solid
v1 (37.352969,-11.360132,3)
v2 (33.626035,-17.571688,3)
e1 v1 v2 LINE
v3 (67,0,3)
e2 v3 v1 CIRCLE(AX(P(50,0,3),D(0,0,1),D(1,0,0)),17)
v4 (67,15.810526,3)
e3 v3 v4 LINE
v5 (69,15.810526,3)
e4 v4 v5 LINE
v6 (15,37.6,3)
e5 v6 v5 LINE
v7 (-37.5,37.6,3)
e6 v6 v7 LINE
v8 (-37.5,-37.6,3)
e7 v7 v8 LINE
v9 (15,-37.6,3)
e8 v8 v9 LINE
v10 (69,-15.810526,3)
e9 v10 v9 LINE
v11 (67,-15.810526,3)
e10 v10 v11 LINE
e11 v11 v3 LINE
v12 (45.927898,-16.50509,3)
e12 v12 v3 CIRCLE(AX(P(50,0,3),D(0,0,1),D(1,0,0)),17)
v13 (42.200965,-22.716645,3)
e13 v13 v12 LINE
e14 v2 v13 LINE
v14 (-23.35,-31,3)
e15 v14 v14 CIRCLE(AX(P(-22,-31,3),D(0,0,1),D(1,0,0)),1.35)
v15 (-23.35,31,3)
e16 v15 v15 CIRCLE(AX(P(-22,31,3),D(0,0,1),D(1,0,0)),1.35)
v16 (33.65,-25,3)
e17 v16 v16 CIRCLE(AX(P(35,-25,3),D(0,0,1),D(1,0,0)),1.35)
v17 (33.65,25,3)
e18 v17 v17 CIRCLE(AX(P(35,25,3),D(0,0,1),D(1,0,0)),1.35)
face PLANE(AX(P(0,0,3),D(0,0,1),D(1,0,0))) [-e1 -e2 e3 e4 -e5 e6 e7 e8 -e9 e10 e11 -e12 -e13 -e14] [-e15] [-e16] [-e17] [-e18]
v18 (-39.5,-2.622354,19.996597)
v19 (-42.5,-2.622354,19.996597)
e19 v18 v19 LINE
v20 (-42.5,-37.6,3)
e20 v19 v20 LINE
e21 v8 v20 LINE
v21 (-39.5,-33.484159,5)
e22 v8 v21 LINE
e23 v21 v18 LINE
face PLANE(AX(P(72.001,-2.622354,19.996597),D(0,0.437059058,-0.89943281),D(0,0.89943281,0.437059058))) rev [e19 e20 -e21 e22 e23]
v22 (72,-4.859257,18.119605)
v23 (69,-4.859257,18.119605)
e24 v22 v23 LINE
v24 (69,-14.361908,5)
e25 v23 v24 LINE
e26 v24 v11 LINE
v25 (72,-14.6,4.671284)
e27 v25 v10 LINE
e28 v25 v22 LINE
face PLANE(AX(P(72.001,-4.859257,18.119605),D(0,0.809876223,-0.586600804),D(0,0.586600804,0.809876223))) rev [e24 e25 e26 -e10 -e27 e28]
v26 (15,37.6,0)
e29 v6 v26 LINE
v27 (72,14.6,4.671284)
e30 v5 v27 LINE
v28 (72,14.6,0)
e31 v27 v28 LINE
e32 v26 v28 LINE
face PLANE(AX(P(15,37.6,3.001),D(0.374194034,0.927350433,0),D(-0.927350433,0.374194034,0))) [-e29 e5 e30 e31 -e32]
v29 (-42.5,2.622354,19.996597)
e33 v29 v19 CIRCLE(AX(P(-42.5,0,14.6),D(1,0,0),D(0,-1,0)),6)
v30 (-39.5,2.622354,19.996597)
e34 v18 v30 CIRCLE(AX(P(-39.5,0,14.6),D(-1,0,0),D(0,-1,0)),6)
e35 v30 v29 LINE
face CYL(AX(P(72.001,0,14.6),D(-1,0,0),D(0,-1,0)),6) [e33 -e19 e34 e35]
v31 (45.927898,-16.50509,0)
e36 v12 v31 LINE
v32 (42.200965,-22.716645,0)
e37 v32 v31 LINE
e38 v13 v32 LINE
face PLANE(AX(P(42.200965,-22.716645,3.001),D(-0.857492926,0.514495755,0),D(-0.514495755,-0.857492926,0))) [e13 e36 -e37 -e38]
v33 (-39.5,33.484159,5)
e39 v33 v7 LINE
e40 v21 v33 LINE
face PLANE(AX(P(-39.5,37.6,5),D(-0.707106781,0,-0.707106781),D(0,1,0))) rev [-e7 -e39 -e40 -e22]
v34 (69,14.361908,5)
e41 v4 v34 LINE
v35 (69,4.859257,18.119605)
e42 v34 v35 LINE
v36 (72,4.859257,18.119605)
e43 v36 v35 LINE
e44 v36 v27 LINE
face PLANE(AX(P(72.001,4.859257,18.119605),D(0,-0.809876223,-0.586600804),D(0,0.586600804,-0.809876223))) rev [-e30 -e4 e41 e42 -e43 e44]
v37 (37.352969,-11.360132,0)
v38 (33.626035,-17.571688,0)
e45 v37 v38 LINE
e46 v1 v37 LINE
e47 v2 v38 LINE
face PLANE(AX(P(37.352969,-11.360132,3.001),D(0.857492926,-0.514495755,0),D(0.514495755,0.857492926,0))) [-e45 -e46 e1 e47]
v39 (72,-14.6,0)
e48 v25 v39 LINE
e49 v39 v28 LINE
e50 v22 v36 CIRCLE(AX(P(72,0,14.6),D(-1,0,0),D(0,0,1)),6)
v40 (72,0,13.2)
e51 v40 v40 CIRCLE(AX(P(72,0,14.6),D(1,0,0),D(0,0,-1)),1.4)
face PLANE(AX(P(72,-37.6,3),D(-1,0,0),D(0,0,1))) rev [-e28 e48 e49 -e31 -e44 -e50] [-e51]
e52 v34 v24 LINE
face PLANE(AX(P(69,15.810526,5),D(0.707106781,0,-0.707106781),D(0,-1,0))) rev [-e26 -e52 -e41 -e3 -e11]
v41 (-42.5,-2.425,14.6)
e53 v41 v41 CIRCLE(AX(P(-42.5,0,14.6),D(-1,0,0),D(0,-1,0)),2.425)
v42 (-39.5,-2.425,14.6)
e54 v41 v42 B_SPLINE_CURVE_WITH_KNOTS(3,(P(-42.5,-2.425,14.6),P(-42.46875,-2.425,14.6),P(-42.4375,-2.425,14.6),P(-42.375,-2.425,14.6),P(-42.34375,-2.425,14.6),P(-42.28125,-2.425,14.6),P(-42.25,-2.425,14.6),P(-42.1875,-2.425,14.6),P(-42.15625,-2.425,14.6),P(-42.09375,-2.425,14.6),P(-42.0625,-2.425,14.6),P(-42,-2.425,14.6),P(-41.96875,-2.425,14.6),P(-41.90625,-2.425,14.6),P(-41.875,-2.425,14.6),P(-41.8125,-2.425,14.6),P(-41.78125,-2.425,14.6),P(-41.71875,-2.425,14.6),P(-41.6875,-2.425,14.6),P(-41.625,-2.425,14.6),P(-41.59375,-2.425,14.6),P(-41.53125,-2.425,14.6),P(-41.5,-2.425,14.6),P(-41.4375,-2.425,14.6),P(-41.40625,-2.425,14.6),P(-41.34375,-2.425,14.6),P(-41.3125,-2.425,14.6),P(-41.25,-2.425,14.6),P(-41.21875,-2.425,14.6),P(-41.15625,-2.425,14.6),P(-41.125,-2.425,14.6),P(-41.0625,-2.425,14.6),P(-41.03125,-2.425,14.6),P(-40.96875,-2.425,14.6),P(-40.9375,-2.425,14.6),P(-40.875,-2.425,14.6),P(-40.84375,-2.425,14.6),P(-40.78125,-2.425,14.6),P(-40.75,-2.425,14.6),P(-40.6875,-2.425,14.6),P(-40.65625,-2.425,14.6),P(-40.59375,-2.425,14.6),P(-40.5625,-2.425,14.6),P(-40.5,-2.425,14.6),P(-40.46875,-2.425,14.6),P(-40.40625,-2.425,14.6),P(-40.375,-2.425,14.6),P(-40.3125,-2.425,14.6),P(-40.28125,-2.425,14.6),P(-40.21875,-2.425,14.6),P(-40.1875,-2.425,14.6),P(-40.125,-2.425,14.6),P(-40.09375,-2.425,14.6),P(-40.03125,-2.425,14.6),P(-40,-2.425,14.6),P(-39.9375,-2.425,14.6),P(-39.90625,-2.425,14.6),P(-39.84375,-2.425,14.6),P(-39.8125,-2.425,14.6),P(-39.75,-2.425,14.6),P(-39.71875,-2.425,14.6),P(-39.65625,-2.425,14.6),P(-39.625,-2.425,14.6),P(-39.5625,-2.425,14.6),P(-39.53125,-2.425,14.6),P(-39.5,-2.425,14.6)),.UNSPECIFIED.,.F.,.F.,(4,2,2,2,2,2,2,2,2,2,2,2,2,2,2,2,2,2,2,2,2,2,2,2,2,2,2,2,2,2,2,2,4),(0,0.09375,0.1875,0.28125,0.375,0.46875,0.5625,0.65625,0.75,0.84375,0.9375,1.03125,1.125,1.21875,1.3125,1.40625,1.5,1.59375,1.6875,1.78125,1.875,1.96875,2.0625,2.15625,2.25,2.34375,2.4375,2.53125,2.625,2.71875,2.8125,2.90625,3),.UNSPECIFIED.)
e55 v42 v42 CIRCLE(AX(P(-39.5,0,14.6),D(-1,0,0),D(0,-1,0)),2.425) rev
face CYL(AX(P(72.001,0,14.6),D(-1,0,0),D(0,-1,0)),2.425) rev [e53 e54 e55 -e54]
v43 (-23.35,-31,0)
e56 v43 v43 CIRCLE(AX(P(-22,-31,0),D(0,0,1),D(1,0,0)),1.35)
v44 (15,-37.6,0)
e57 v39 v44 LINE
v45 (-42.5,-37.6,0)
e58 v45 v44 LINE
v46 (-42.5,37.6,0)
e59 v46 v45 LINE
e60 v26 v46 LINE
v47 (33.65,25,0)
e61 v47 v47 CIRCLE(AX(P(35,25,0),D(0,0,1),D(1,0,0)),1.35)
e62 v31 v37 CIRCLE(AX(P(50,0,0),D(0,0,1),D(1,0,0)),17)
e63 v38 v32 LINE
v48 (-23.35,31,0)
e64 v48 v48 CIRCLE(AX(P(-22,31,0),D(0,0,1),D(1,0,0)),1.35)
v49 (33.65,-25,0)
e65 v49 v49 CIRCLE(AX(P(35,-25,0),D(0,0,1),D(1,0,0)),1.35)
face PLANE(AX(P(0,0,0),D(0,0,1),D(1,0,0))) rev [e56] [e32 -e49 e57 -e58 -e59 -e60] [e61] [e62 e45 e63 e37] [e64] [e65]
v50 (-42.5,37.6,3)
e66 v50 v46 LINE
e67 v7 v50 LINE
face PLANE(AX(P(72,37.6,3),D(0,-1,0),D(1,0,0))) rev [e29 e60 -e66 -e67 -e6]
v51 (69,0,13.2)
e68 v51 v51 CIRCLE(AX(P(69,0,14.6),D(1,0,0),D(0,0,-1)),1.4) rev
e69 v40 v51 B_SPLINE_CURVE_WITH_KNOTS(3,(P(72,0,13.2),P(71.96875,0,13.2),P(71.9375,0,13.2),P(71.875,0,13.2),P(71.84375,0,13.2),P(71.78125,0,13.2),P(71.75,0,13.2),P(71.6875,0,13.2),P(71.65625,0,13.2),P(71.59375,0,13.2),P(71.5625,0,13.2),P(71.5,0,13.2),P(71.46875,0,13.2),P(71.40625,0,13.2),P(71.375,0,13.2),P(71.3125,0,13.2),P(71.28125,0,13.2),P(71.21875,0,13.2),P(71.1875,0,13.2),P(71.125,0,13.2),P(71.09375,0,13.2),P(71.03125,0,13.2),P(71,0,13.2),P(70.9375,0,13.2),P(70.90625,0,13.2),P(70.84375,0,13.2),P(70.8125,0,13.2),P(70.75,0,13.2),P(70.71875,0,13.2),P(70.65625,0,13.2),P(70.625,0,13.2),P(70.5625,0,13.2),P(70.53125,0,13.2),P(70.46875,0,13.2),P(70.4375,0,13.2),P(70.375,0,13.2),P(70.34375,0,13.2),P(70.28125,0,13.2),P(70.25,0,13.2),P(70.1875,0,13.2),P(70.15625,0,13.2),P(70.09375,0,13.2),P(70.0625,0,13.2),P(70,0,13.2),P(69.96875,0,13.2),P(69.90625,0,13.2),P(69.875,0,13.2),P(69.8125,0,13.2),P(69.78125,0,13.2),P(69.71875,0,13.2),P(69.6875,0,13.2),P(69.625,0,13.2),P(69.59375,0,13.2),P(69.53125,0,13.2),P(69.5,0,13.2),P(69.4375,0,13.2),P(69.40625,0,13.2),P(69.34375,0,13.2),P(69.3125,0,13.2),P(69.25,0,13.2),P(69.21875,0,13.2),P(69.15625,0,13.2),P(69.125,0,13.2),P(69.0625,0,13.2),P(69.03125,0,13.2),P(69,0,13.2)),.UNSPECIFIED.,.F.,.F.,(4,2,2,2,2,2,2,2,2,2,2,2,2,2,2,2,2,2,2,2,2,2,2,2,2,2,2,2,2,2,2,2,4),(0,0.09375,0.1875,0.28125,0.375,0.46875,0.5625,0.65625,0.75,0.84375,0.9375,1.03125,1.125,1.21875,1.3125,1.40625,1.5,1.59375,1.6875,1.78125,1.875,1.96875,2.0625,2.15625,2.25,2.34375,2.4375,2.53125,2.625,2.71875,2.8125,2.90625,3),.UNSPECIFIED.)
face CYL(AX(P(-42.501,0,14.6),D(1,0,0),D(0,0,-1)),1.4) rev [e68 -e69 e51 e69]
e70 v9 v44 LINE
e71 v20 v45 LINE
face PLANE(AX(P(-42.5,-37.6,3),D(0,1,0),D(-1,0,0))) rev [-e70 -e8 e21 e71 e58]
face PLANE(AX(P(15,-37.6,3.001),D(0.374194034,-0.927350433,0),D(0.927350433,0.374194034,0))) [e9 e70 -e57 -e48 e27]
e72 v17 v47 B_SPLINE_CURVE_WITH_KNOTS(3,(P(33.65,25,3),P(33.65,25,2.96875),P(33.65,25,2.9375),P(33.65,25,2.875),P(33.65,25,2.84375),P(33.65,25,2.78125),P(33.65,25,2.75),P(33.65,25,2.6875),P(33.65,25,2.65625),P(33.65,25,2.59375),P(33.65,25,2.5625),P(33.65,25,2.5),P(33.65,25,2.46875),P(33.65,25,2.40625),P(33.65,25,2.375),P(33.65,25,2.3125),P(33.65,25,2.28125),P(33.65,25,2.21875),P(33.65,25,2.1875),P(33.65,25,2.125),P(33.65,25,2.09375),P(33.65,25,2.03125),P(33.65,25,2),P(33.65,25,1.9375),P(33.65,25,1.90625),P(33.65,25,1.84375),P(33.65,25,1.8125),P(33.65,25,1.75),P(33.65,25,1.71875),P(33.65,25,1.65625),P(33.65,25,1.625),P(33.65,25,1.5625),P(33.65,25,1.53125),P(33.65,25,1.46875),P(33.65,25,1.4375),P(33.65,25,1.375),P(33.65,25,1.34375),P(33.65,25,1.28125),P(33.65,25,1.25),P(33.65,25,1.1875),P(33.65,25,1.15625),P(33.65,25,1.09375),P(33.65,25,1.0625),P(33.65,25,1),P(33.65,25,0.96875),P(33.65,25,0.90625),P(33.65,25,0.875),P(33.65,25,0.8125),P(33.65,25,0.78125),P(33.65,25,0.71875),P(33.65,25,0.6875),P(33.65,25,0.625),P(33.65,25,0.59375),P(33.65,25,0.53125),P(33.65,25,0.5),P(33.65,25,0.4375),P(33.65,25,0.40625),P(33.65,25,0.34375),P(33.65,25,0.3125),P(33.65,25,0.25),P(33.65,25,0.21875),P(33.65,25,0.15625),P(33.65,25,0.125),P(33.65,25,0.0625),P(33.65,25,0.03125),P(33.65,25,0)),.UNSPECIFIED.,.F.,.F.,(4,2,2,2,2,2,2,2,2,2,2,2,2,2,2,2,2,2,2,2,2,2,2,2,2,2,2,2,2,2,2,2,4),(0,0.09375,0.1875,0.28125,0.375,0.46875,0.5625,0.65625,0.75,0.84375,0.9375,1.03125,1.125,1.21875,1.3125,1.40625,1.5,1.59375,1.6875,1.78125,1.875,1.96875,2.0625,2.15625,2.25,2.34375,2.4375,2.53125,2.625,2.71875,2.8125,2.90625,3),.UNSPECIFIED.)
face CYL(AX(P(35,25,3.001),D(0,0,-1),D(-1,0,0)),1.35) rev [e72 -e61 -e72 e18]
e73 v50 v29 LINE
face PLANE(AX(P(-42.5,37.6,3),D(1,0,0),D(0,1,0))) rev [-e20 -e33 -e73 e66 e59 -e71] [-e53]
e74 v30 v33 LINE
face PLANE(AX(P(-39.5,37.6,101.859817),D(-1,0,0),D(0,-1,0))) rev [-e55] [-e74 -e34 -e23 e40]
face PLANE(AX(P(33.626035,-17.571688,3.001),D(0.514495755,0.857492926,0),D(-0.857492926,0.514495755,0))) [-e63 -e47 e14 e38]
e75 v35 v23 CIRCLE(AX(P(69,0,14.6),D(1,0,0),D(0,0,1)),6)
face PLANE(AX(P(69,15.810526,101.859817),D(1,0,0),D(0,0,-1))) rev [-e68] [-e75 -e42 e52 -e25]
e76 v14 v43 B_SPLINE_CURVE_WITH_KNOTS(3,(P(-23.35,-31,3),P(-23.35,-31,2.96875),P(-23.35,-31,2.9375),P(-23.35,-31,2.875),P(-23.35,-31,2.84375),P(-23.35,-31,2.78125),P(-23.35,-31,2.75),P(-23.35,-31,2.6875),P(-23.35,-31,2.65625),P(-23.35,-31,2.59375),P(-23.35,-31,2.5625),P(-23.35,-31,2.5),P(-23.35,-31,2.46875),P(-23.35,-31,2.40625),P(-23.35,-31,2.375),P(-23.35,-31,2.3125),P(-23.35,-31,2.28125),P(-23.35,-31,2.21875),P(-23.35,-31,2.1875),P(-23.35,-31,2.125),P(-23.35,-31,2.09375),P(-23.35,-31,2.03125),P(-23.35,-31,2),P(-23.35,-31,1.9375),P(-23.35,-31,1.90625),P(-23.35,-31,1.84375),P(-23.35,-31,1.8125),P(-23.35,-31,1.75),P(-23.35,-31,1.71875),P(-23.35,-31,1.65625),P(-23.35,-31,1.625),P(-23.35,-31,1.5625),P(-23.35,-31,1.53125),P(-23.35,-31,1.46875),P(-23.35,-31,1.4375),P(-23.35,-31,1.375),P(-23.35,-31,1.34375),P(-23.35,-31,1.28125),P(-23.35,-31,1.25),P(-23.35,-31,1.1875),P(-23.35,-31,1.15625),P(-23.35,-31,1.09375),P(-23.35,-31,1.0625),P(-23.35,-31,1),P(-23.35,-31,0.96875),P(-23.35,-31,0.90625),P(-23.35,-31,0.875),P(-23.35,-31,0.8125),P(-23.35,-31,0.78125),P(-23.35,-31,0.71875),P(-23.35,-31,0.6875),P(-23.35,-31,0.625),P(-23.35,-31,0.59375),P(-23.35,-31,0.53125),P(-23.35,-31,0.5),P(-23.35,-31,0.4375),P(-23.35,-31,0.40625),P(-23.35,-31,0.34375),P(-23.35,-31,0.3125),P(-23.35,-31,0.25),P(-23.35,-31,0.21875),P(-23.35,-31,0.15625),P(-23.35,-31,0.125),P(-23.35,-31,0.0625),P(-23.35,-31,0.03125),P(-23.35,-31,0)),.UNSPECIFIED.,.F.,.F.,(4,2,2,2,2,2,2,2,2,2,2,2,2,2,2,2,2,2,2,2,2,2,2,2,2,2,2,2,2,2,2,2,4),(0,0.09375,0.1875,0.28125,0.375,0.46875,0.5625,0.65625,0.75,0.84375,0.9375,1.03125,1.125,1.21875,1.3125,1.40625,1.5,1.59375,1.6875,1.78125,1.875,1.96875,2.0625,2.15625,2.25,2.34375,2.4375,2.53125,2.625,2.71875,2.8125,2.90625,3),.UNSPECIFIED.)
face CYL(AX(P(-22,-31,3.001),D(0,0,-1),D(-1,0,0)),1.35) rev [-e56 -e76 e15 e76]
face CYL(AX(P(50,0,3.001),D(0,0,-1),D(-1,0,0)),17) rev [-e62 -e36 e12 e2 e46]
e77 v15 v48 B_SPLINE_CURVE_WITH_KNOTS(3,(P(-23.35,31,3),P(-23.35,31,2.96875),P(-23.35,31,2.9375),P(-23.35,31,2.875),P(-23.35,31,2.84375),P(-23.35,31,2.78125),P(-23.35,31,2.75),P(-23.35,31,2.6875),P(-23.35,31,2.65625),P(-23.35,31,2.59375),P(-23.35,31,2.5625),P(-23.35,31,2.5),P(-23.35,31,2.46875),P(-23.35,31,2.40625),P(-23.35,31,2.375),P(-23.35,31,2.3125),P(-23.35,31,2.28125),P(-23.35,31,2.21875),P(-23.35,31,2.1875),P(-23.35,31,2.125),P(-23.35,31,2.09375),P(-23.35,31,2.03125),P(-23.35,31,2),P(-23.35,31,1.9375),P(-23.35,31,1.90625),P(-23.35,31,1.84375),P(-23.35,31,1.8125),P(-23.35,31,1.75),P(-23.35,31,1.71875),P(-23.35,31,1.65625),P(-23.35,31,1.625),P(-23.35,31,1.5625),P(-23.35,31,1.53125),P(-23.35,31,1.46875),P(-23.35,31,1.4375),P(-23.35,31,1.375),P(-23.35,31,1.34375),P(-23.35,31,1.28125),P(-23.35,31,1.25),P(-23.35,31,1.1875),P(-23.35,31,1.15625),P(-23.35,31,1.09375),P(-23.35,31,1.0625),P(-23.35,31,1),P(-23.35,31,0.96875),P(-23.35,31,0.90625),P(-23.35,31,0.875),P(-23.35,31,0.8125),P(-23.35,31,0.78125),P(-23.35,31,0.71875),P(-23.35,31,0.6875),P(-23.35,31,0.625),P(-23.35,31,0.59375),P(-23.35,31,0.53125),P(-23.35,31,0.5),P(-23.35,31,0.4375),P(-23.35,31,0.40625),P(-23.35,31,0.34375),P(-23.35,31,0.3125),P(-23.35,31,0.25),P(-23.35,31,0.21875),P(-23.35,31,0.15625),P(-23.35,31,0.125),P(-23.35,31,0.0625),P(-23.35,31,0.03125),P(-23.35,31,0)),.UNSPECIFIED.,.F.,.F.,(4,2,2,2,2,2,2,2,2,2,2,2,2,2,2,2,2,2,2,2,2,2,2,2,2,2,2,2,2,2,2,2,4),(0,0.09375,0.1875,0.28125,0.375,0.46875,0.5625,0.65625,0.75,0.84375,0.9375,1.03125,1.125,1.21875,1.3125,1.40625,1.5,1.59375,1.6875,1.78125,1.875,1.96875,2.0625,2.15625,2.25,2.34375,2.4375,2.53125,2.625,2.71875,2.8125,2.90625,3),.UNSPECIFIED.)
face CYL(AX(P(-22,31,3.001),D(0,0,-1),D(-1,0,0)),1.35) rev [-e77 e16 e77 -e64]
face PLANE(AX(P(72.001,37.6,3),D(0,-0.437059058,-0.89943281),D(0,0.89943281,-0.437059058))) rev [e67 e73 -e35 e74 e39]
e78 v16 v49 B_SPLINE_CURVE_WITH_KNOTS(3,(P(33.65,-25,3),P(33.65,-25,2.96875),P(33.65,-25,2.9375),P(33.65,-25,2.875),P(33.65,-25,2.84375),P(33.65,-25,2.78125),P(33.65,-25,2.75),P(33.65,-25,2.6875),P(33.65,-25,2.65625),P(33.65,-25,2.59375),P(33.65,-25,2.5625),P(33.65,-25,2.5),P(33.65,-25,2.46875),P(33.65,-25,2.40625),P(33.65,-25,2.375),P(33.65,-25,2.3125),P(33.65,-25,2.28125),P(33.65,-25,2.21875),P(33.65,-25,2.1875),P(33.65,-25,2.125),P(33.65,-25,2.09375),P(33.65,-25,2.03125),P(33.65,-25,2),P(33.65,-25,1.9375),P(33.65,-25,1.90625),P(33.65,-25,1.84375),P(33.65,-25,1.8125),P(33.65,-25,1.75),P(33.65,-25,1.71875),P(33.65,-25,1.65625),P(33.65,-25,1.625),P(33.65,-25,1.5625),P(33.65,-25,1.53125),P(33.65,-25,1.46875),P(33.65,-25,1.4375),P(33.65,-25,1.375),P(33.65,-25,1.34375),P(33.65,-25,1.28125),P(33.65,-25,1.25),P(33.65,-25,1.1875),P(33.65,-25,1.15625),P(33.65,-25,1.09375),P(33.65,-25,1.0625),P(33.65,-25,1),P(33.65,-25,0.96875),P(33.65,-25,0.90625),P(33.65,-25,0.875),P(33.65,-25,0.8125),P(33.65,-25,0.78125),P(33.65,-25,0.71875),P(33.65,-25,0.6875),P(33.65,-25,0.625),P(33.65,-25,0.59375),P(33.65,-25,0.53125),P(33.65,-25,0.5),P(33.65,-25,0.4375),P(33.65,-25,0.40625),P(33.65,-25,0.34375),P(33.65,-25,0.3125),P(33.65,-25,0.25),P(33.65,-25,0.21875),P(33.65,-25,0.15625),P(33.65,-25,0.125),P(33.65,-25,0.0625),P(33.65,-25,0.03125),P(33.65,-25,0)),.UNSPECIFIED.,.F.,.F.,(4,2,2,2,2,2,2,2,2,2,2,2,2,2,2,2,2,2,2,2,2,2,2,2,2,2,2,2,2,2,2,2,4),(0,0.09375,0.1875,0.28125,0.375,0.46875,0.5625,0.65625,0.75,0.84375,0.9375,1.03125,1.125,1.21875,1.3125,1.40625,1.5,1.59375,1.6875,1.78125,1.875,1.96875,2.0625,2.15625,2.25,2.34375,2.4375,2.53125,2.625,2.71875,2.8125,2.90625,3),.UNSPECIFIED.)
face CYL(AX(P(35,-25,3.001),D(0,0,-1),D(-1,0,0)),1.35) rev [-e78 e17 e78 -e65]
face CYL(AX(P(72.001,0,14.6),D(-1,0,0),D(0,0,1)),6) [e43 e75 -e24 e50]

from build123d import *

# Parameters (mm, degrees)
SKETCH1_W           = 114.5
SKETCH1_H           = 75.2
BOSS_EXTRUDE1_DEPTH = 3
CUT_EXTRUDE1_REACH  = 83.282
SKETCH3_R           = 1.35
SKETCH5_W           = 3
SKETCH5_H           = 75.2
BOSS_EXTRUDE3_DEPTH = 17.6
CUT_EXTRUDE2_REACH  = 124.264
CUT_EXTRUDE3_REACH  = 124.264
CUT_EXTRUDE4_REACH  = 121.459
CUT_EXTRUDE5_REACH  = 121.459
CUT_EXTRUDE6_REACH  = 124.264
SKETCH10_R          = 2.425
CUT_EXTRUDE7_REACH  = 124.264
SKETCH11_R          = 1.4
CHAMFER1_SIZE       = 2


with BuildPart() as part:
    # Sketch1 → Boss-Extrude1 (new body)
    with BuildSketch(Plane.XY):
        with Locations((14.75, 0)):
            Rectangle(SKETCH1_W, SKETCH1_H)
    extrude(amount=BOSS_EXTRUDE1_DEPTH)

    # Sketch3 → Cut-Extrude1 (cut, up to next)
    with BuildSketch(Plane.XY, mode=Mode.PRIVATE) as cut_extrude1_sk1:
        with Locations(Location((35, 25, 0), (0, 0, 180))):
            Circle(SKETCH3_R)
    cut_extrude1_tool1 = extrude(cut_extrude1_sk1.sketch, amount=CUT_EXTRUDE1_REACH, mode=Mode.PRIVATE) & part.part
    # Sketch3 → Cut-Extrude1 (cut, up to next)
    with BuildSketch(Plane.XY, mode=Mode.PRIVATE) as cut_extrude1_sk2:
        with Locations(Location((-22, 31, 0), (0, 0, 180))):
            Circle(SKETCH3_R)
    cut_extrude1_tool2 = extrude(cut_extrude1_sk2.sketch, amount=CUT_EXTRUDE1_REACH, mode=Mode.PRIVATE) & part.part
    # Sketch3 → Cut-Extrude1 (cut, up to next)
    with BuildSketch(Plane.XY, mode=Mode.PRIVATE) as cut_extrude1_sk3:
        with Locations(Location((-22, -31, 0), (0, 0, 180))):
            Circle(SKETCH3_R)
    cut_extrude1_tool3 = extrude(cut_extrude1_sk3.sketch, amount=CUT_EXTRUDE1_REACH, mode=Mode.PRIVATE) & part.part
    # Sketch3 → Cut-Extrude1 (cut, up to next)
    with BuildSketch(Plane.XY, mode=Mode.PRIVATE) as cut_extrude1_sk4:
        with Locations(Location((35, -25, 0), (0, 0, 180))):
            Circle(SKETCH3_R)
    cut_extrude1_tool4 = extrude(cut_extrude1_sk4.sketch, amount=CUT_EXTRUDE1_REACH, mode=Mode.PRIVATE) & part.part
    # Sketch3 → Cut-Extrude1 (cut, up to next)
    with BuildSketch(Plane.XY, mode=Mode.PRIVATE) as cut_extrude1_sk5:
        with BuildLine():
            Line((37.352968819, -11.360132143), (33.626035358, -17.571687912))
            Line((33.626035358, -17.571687912), (42.200964615, -22.716645466))
            Line((42.200964615, -22.716645466), (45.927898076, -16.505089698))
            ThreePointArc((45.927898076, -16.505089698), (58.746427842, 14.577379737), (37.352968819, -11.360132143))
        make_face()
    cut_extrude1_tool5 = extrude(cut_extrude1_sk5.sketch, amount=CUT_EXTRUDE1_REACH, mode=Mode.PRIVATE) & part.part
    # Sketch3 → Cut-Extrude1 (cut, up to next)
    with BuildSketch(Plane.XY, mode=Mode.PRIVATE) as cut_extrude1_sk6:
        Polygon((15, -37.6), (72, -14.6), (72, -37.6), align=None)
    cut_extrude1_tool6 = extrude(cut_extrude1_sk6.sketch, amount=CUT_EXTRUDE1_REACH, mode=Mode.PRIVATE) & part.part
    # Sketch3 → Cut-Extrude1 (cut, up to next)
    with BuildSketch(Plane.XY, mode=Mode.PRIVATE) as cut_extrude1_sk7:
        Polygon((15, 37.6), (72, 14.6), (72, 37.6), align=None)
    cut_extrude1_tool7 = extrude(cut_extrude1_sk7.sketch, amount=CUT_EXTRUDE1_REACH, mode=Mode.PRIVATE) & part.part
    add(cut_extrude1_tool1.solids().sort_by_distance((35, 25, 0))[0], mode=Mode.SUBTRACT)
    add(cut_extrude1_tool2.solids().sort_by_distance((-22, 31, 0))[0], mode=Mode.SUBTRACT)
    add(cut_extrude1_tool3.solids().sort_by_distance((-22, -31, 0))[0], mode=Mode.SUBTRACT)
    add(cut_extrude1_tool4.solids().sort_by_distance((35, -25, 0))[0], mode=Mode.SUBTRACT)
    add(cut_extrude1_tool5.solids().sort_by_distance((49.284681, -1.192198, 0))[0], mode=Mode.SUBTRACT)
    add(cut_extrude1_tool6.solids().sort_by_distance((53, -29.933333, 0))[0], mode=Mode.SUBTRACT)
    add(cut_extrude1_tool7.solids().sort_by_distance((53, 29.933333, 0))[0], mode=Mode.SUBTRACT)

    # Sketch5 → Boss-Extrude3 (add)
    with BuildSketch(Plane.XY.offset(3)):
        Polygon((72, -14.6), (69, -15.810526316), (69, 15.810526316), (72, 14.6), align=None)
        with Locations((-41, 0)):
            Rectangle(SKETCH5_W, SKETCH5_H)
    extrude(amount=BOSS_EXTRUDE3_DEPTH)

    # Sketch6 → Cut-Extrude2 (cut, up to next)
    with BuildSketch(Plane.ZY.offset(42.5), mode=Mode.PRIVATE) as cut_extrude2_sk1:
        with BuildLine():
            Line((3, 37.6), (19.996596859, 2.62235435))
            ThreePointArc((19.996596859, 2.62235435), (20.447203655, 1.345440234), (20.6, 0))
            Line((20.6, 0), (20.6, 37.6))
            Line((20.6, 37.6), (3, 37.6))
        make_face()
    cut_extrude2_tool1 = extrude(cut_extrude2_sk1.sketch, amount=-CUT_EXTRUDE2_REACH, mode=Mode.PRIVATE) & part.part
    add(cut_extrude2_tool1.solids().sort_by_distance((-42.5, 25.516122, 14.735887))[0], mode=Mode.SUBTRACT)

    # Sketch7 → Cut-Extrude3 (cut, up to next)
    with BuildSketch(Plane.ZY.offset(42.5), mode=Mode.PRIVATE) as cut_extrude3_sk1:
        with BuildLine():
            Line((20.6, 0), (20.6, -37.6))
            Line((20.6, -37.6), (3, -37.6))
            Line((3, -37.6), (19.996596859, -2.62235435))
            ThreePointArc((19.996596859, -2.62235435), (20.447203655, -1.345440234), (20.6, 0))
        make_face()
    cut_extrude3_tool1 = extrude(cut_extrude3_sk1.sketch, amount=-CUT_EXTRUDE3_REACH, mode=Mode.PRIVATE) & part.part
    add(cut_extrude3_tool1.solids().sort_by_distance((-42.5, -25.516122, 14.735887))[0], mode=Mode.SUBTRACT)

    # Sketch8 → Cut-Extrude4 (cut, up to next)
    with BuildSketch(Plane.ZY.offset(-69), mode=Mode.PRIVATE) as cut_extrude4_sk1:
        with BuildLine():
            Line((18.119604827, 4.859257336), (3, 15.810526316))
            Line((3, 15.810526316), (20.6, 15.810526316))
            Line((20.6, 15.810526316), (20.6, 0))
            ThreePointArc((20.6, 0), (19.944044768, 2.727853647), (18.119604827, 4.859257336))
        make_face()
    cut_extrude4_tool1 = extrude(cut_extrude4_sk1.sketch, amount=-CUT_EXTRUDE4_REACH, mode=Mode.PRIVATE) & part.part
    add(cut_extrude4_tool1.solids().sort_by_distance((69, 11.454378, 14.798599))[0], mode=Mode.SUBTRACT)

    # Sketch9 → Cut-Extrude5 (cut, up to next)
    with BuildSketch(Plane.ZY.offset(-69), mode=Mode.PRIVATE) as cut_extrude5_sk1:
        with BuildLine():
            Line((18.119604827, -4.859257336), (3, -15.810526316))
            Line((3, -15.810526316), (20.6, -15.810526316))
            Line((20.6, -15.810526316), (20.6, 0))
            ThreePointArc((20.6, 0), (19.944044768, -2.727853647), (18.119604827, -4.859257336))
        make_face()
    cut_extrude5_tool1 = extrude(cut_extrude5_sk1.sketch, amount=-CUT_EXTRUDE5_REACH, mode=Mode.PRIVATE) & part.part
    add(cut_extrude5_tool1.solids().sort_by_distance((69, -11.454378, 14.798599))[0], mode=Mode.SUBTRACT)

    # Sketch10 → Cut-Extrude6 (cut, up to next)
    with BuildSketch(Plane.ZY.offset(42.5), mode=Mode.PRIVATE) as cut_extrude6_sk1:
        with Locations(Location((14.6, 0, 0), (0, 0, 270))):
            Circle(SKETCH10_R)
    cut_extrude6_tool1 = extrude(cut_extrude6_sk1.sketch, amount=-CUT_EXTRUDE6_REACH, mode=Mode.PRIVATE) & part.part
    add(cut_extrude6_tool1.solids().sort_by_distance((-42.5, 0, 14.6))[0], mode=Mode.SUBTRACT)

    # Sketch11 → Cut-Extrude7 (cut, up to next)
    with BuildSketch(Plane(origin=(72, 0, 0), x_dir=(0, 0, -1), z_dir=(1, 0, 0)), mode=Mode.PRIVATE) as cut_extrude7_sk1:
        with Locations((-14.6, 0)):
            Circle(SKETCH11_R)
    cut_extrude7_tool1 = extrude(cut_extrude7_sk1.sketch, amount=-CUT_EXTRUDE7_REACH, mode=Mode.PRIVATE) & part.part
    add(cut_extrude7_tool1.solids().sort_by_distance((72, 0, 14.6))[0], mode=Mode.SUBTRACT)

    # Chamfer1
    # the kernel refuses this chamfer: 2 mm, written as the material it adds along each edge
    with BuildSketch(Plane(origin=(69, -20.953892292, 3), x_dir=(-0.9996219169112968, 0, -0.0274958766105862), z_dir=(0, 1, 0))) as chamfer1_piece_1_section:
        Polygon((CHAMFER1_SIZE * 0.999621916911, CHAMFER1_SIZE * 0.0274958766106), (-CHAMFER1_SIZE * 0.0274958766106, CHAMFER1_SIZE * 0.999621916911), (0, 0), align=None)
    chamfer1_piece_1 = extrude(amount=41.907784583, mode=Mode.PRIVATE)
    chamfer1_piece_1 = chamfer1_piece_1 - Plane(origin=(50, 0, 3.647655416), x_dir=(-0.23953540727459496, -0.9708876292660207, 0), z_dir=(0, 0, -1)) * Cylinder(17, 92, mode=Mode.PRIVATE)
    chamfer1_piece_1 = split(chamfer1_piece_1, bisect_by=Plane(origin=(68.334125846, -10.062431967, 10.935967533), z_dir=(0, 0.8098762227411254, -0.5866008044987383)), keep=Keep.TOP, mode=Mode.PRIVATE)
    chamfer1_piece_1 = split(chamfer1_piece_1, bisect_by=Plane(origin=(68.334125846, 10.062431967, 10.935967533), z_dir=(0, -0.8098762227411249, -0.5866008044987391)), keep=Keep.TOP, mode=Mode.PRIVATE)
    add(chamfer1_piece_1)
    with BuildSketch(Plane(origin=(-39.5, -37.6, 3), x_dir=(0.9996219169112968, 0, -0.027495876610586296), z_dir=(0, 1, 0))) as chamfer1_piece_2_section:
        Polygon((CHAMFER1_SIZE * 0.999621916911, -CHAMFER1_SIZE * 0.0274958766106), (-CHAMFER1_SIZE * 0.0274958766106, -CHAMFER1_SIZE * 0.999621916911), (0, 0), align=None)
    chamfer1_piece_2 = extrude(amount=75.2, mode=Mode.PRIVATE)
    chamfer1_piece_2 = split(chamfer1_piece_2, bisect_by=Plane(origin=(-38.832756729, 6.928738124, 17.904006933), z_dir=(0, -0.4370590583687447, -0.8994328098851111)), keep=Keep.TOP, mode=Mode.PRIVATE)
    chamfer1_piece_2 = split(chamfer1_piece_2, bisect_by=Plane(origin=(-38.832756729, -6.928738124, 17.904006933), z_dir=(0, 0.4370590583688008, -0.8994328098850838)), keep=Keep.TOP, mode=Mode.PRIVATE)
    add(chamfer1_piece_2)


solid = part.part
